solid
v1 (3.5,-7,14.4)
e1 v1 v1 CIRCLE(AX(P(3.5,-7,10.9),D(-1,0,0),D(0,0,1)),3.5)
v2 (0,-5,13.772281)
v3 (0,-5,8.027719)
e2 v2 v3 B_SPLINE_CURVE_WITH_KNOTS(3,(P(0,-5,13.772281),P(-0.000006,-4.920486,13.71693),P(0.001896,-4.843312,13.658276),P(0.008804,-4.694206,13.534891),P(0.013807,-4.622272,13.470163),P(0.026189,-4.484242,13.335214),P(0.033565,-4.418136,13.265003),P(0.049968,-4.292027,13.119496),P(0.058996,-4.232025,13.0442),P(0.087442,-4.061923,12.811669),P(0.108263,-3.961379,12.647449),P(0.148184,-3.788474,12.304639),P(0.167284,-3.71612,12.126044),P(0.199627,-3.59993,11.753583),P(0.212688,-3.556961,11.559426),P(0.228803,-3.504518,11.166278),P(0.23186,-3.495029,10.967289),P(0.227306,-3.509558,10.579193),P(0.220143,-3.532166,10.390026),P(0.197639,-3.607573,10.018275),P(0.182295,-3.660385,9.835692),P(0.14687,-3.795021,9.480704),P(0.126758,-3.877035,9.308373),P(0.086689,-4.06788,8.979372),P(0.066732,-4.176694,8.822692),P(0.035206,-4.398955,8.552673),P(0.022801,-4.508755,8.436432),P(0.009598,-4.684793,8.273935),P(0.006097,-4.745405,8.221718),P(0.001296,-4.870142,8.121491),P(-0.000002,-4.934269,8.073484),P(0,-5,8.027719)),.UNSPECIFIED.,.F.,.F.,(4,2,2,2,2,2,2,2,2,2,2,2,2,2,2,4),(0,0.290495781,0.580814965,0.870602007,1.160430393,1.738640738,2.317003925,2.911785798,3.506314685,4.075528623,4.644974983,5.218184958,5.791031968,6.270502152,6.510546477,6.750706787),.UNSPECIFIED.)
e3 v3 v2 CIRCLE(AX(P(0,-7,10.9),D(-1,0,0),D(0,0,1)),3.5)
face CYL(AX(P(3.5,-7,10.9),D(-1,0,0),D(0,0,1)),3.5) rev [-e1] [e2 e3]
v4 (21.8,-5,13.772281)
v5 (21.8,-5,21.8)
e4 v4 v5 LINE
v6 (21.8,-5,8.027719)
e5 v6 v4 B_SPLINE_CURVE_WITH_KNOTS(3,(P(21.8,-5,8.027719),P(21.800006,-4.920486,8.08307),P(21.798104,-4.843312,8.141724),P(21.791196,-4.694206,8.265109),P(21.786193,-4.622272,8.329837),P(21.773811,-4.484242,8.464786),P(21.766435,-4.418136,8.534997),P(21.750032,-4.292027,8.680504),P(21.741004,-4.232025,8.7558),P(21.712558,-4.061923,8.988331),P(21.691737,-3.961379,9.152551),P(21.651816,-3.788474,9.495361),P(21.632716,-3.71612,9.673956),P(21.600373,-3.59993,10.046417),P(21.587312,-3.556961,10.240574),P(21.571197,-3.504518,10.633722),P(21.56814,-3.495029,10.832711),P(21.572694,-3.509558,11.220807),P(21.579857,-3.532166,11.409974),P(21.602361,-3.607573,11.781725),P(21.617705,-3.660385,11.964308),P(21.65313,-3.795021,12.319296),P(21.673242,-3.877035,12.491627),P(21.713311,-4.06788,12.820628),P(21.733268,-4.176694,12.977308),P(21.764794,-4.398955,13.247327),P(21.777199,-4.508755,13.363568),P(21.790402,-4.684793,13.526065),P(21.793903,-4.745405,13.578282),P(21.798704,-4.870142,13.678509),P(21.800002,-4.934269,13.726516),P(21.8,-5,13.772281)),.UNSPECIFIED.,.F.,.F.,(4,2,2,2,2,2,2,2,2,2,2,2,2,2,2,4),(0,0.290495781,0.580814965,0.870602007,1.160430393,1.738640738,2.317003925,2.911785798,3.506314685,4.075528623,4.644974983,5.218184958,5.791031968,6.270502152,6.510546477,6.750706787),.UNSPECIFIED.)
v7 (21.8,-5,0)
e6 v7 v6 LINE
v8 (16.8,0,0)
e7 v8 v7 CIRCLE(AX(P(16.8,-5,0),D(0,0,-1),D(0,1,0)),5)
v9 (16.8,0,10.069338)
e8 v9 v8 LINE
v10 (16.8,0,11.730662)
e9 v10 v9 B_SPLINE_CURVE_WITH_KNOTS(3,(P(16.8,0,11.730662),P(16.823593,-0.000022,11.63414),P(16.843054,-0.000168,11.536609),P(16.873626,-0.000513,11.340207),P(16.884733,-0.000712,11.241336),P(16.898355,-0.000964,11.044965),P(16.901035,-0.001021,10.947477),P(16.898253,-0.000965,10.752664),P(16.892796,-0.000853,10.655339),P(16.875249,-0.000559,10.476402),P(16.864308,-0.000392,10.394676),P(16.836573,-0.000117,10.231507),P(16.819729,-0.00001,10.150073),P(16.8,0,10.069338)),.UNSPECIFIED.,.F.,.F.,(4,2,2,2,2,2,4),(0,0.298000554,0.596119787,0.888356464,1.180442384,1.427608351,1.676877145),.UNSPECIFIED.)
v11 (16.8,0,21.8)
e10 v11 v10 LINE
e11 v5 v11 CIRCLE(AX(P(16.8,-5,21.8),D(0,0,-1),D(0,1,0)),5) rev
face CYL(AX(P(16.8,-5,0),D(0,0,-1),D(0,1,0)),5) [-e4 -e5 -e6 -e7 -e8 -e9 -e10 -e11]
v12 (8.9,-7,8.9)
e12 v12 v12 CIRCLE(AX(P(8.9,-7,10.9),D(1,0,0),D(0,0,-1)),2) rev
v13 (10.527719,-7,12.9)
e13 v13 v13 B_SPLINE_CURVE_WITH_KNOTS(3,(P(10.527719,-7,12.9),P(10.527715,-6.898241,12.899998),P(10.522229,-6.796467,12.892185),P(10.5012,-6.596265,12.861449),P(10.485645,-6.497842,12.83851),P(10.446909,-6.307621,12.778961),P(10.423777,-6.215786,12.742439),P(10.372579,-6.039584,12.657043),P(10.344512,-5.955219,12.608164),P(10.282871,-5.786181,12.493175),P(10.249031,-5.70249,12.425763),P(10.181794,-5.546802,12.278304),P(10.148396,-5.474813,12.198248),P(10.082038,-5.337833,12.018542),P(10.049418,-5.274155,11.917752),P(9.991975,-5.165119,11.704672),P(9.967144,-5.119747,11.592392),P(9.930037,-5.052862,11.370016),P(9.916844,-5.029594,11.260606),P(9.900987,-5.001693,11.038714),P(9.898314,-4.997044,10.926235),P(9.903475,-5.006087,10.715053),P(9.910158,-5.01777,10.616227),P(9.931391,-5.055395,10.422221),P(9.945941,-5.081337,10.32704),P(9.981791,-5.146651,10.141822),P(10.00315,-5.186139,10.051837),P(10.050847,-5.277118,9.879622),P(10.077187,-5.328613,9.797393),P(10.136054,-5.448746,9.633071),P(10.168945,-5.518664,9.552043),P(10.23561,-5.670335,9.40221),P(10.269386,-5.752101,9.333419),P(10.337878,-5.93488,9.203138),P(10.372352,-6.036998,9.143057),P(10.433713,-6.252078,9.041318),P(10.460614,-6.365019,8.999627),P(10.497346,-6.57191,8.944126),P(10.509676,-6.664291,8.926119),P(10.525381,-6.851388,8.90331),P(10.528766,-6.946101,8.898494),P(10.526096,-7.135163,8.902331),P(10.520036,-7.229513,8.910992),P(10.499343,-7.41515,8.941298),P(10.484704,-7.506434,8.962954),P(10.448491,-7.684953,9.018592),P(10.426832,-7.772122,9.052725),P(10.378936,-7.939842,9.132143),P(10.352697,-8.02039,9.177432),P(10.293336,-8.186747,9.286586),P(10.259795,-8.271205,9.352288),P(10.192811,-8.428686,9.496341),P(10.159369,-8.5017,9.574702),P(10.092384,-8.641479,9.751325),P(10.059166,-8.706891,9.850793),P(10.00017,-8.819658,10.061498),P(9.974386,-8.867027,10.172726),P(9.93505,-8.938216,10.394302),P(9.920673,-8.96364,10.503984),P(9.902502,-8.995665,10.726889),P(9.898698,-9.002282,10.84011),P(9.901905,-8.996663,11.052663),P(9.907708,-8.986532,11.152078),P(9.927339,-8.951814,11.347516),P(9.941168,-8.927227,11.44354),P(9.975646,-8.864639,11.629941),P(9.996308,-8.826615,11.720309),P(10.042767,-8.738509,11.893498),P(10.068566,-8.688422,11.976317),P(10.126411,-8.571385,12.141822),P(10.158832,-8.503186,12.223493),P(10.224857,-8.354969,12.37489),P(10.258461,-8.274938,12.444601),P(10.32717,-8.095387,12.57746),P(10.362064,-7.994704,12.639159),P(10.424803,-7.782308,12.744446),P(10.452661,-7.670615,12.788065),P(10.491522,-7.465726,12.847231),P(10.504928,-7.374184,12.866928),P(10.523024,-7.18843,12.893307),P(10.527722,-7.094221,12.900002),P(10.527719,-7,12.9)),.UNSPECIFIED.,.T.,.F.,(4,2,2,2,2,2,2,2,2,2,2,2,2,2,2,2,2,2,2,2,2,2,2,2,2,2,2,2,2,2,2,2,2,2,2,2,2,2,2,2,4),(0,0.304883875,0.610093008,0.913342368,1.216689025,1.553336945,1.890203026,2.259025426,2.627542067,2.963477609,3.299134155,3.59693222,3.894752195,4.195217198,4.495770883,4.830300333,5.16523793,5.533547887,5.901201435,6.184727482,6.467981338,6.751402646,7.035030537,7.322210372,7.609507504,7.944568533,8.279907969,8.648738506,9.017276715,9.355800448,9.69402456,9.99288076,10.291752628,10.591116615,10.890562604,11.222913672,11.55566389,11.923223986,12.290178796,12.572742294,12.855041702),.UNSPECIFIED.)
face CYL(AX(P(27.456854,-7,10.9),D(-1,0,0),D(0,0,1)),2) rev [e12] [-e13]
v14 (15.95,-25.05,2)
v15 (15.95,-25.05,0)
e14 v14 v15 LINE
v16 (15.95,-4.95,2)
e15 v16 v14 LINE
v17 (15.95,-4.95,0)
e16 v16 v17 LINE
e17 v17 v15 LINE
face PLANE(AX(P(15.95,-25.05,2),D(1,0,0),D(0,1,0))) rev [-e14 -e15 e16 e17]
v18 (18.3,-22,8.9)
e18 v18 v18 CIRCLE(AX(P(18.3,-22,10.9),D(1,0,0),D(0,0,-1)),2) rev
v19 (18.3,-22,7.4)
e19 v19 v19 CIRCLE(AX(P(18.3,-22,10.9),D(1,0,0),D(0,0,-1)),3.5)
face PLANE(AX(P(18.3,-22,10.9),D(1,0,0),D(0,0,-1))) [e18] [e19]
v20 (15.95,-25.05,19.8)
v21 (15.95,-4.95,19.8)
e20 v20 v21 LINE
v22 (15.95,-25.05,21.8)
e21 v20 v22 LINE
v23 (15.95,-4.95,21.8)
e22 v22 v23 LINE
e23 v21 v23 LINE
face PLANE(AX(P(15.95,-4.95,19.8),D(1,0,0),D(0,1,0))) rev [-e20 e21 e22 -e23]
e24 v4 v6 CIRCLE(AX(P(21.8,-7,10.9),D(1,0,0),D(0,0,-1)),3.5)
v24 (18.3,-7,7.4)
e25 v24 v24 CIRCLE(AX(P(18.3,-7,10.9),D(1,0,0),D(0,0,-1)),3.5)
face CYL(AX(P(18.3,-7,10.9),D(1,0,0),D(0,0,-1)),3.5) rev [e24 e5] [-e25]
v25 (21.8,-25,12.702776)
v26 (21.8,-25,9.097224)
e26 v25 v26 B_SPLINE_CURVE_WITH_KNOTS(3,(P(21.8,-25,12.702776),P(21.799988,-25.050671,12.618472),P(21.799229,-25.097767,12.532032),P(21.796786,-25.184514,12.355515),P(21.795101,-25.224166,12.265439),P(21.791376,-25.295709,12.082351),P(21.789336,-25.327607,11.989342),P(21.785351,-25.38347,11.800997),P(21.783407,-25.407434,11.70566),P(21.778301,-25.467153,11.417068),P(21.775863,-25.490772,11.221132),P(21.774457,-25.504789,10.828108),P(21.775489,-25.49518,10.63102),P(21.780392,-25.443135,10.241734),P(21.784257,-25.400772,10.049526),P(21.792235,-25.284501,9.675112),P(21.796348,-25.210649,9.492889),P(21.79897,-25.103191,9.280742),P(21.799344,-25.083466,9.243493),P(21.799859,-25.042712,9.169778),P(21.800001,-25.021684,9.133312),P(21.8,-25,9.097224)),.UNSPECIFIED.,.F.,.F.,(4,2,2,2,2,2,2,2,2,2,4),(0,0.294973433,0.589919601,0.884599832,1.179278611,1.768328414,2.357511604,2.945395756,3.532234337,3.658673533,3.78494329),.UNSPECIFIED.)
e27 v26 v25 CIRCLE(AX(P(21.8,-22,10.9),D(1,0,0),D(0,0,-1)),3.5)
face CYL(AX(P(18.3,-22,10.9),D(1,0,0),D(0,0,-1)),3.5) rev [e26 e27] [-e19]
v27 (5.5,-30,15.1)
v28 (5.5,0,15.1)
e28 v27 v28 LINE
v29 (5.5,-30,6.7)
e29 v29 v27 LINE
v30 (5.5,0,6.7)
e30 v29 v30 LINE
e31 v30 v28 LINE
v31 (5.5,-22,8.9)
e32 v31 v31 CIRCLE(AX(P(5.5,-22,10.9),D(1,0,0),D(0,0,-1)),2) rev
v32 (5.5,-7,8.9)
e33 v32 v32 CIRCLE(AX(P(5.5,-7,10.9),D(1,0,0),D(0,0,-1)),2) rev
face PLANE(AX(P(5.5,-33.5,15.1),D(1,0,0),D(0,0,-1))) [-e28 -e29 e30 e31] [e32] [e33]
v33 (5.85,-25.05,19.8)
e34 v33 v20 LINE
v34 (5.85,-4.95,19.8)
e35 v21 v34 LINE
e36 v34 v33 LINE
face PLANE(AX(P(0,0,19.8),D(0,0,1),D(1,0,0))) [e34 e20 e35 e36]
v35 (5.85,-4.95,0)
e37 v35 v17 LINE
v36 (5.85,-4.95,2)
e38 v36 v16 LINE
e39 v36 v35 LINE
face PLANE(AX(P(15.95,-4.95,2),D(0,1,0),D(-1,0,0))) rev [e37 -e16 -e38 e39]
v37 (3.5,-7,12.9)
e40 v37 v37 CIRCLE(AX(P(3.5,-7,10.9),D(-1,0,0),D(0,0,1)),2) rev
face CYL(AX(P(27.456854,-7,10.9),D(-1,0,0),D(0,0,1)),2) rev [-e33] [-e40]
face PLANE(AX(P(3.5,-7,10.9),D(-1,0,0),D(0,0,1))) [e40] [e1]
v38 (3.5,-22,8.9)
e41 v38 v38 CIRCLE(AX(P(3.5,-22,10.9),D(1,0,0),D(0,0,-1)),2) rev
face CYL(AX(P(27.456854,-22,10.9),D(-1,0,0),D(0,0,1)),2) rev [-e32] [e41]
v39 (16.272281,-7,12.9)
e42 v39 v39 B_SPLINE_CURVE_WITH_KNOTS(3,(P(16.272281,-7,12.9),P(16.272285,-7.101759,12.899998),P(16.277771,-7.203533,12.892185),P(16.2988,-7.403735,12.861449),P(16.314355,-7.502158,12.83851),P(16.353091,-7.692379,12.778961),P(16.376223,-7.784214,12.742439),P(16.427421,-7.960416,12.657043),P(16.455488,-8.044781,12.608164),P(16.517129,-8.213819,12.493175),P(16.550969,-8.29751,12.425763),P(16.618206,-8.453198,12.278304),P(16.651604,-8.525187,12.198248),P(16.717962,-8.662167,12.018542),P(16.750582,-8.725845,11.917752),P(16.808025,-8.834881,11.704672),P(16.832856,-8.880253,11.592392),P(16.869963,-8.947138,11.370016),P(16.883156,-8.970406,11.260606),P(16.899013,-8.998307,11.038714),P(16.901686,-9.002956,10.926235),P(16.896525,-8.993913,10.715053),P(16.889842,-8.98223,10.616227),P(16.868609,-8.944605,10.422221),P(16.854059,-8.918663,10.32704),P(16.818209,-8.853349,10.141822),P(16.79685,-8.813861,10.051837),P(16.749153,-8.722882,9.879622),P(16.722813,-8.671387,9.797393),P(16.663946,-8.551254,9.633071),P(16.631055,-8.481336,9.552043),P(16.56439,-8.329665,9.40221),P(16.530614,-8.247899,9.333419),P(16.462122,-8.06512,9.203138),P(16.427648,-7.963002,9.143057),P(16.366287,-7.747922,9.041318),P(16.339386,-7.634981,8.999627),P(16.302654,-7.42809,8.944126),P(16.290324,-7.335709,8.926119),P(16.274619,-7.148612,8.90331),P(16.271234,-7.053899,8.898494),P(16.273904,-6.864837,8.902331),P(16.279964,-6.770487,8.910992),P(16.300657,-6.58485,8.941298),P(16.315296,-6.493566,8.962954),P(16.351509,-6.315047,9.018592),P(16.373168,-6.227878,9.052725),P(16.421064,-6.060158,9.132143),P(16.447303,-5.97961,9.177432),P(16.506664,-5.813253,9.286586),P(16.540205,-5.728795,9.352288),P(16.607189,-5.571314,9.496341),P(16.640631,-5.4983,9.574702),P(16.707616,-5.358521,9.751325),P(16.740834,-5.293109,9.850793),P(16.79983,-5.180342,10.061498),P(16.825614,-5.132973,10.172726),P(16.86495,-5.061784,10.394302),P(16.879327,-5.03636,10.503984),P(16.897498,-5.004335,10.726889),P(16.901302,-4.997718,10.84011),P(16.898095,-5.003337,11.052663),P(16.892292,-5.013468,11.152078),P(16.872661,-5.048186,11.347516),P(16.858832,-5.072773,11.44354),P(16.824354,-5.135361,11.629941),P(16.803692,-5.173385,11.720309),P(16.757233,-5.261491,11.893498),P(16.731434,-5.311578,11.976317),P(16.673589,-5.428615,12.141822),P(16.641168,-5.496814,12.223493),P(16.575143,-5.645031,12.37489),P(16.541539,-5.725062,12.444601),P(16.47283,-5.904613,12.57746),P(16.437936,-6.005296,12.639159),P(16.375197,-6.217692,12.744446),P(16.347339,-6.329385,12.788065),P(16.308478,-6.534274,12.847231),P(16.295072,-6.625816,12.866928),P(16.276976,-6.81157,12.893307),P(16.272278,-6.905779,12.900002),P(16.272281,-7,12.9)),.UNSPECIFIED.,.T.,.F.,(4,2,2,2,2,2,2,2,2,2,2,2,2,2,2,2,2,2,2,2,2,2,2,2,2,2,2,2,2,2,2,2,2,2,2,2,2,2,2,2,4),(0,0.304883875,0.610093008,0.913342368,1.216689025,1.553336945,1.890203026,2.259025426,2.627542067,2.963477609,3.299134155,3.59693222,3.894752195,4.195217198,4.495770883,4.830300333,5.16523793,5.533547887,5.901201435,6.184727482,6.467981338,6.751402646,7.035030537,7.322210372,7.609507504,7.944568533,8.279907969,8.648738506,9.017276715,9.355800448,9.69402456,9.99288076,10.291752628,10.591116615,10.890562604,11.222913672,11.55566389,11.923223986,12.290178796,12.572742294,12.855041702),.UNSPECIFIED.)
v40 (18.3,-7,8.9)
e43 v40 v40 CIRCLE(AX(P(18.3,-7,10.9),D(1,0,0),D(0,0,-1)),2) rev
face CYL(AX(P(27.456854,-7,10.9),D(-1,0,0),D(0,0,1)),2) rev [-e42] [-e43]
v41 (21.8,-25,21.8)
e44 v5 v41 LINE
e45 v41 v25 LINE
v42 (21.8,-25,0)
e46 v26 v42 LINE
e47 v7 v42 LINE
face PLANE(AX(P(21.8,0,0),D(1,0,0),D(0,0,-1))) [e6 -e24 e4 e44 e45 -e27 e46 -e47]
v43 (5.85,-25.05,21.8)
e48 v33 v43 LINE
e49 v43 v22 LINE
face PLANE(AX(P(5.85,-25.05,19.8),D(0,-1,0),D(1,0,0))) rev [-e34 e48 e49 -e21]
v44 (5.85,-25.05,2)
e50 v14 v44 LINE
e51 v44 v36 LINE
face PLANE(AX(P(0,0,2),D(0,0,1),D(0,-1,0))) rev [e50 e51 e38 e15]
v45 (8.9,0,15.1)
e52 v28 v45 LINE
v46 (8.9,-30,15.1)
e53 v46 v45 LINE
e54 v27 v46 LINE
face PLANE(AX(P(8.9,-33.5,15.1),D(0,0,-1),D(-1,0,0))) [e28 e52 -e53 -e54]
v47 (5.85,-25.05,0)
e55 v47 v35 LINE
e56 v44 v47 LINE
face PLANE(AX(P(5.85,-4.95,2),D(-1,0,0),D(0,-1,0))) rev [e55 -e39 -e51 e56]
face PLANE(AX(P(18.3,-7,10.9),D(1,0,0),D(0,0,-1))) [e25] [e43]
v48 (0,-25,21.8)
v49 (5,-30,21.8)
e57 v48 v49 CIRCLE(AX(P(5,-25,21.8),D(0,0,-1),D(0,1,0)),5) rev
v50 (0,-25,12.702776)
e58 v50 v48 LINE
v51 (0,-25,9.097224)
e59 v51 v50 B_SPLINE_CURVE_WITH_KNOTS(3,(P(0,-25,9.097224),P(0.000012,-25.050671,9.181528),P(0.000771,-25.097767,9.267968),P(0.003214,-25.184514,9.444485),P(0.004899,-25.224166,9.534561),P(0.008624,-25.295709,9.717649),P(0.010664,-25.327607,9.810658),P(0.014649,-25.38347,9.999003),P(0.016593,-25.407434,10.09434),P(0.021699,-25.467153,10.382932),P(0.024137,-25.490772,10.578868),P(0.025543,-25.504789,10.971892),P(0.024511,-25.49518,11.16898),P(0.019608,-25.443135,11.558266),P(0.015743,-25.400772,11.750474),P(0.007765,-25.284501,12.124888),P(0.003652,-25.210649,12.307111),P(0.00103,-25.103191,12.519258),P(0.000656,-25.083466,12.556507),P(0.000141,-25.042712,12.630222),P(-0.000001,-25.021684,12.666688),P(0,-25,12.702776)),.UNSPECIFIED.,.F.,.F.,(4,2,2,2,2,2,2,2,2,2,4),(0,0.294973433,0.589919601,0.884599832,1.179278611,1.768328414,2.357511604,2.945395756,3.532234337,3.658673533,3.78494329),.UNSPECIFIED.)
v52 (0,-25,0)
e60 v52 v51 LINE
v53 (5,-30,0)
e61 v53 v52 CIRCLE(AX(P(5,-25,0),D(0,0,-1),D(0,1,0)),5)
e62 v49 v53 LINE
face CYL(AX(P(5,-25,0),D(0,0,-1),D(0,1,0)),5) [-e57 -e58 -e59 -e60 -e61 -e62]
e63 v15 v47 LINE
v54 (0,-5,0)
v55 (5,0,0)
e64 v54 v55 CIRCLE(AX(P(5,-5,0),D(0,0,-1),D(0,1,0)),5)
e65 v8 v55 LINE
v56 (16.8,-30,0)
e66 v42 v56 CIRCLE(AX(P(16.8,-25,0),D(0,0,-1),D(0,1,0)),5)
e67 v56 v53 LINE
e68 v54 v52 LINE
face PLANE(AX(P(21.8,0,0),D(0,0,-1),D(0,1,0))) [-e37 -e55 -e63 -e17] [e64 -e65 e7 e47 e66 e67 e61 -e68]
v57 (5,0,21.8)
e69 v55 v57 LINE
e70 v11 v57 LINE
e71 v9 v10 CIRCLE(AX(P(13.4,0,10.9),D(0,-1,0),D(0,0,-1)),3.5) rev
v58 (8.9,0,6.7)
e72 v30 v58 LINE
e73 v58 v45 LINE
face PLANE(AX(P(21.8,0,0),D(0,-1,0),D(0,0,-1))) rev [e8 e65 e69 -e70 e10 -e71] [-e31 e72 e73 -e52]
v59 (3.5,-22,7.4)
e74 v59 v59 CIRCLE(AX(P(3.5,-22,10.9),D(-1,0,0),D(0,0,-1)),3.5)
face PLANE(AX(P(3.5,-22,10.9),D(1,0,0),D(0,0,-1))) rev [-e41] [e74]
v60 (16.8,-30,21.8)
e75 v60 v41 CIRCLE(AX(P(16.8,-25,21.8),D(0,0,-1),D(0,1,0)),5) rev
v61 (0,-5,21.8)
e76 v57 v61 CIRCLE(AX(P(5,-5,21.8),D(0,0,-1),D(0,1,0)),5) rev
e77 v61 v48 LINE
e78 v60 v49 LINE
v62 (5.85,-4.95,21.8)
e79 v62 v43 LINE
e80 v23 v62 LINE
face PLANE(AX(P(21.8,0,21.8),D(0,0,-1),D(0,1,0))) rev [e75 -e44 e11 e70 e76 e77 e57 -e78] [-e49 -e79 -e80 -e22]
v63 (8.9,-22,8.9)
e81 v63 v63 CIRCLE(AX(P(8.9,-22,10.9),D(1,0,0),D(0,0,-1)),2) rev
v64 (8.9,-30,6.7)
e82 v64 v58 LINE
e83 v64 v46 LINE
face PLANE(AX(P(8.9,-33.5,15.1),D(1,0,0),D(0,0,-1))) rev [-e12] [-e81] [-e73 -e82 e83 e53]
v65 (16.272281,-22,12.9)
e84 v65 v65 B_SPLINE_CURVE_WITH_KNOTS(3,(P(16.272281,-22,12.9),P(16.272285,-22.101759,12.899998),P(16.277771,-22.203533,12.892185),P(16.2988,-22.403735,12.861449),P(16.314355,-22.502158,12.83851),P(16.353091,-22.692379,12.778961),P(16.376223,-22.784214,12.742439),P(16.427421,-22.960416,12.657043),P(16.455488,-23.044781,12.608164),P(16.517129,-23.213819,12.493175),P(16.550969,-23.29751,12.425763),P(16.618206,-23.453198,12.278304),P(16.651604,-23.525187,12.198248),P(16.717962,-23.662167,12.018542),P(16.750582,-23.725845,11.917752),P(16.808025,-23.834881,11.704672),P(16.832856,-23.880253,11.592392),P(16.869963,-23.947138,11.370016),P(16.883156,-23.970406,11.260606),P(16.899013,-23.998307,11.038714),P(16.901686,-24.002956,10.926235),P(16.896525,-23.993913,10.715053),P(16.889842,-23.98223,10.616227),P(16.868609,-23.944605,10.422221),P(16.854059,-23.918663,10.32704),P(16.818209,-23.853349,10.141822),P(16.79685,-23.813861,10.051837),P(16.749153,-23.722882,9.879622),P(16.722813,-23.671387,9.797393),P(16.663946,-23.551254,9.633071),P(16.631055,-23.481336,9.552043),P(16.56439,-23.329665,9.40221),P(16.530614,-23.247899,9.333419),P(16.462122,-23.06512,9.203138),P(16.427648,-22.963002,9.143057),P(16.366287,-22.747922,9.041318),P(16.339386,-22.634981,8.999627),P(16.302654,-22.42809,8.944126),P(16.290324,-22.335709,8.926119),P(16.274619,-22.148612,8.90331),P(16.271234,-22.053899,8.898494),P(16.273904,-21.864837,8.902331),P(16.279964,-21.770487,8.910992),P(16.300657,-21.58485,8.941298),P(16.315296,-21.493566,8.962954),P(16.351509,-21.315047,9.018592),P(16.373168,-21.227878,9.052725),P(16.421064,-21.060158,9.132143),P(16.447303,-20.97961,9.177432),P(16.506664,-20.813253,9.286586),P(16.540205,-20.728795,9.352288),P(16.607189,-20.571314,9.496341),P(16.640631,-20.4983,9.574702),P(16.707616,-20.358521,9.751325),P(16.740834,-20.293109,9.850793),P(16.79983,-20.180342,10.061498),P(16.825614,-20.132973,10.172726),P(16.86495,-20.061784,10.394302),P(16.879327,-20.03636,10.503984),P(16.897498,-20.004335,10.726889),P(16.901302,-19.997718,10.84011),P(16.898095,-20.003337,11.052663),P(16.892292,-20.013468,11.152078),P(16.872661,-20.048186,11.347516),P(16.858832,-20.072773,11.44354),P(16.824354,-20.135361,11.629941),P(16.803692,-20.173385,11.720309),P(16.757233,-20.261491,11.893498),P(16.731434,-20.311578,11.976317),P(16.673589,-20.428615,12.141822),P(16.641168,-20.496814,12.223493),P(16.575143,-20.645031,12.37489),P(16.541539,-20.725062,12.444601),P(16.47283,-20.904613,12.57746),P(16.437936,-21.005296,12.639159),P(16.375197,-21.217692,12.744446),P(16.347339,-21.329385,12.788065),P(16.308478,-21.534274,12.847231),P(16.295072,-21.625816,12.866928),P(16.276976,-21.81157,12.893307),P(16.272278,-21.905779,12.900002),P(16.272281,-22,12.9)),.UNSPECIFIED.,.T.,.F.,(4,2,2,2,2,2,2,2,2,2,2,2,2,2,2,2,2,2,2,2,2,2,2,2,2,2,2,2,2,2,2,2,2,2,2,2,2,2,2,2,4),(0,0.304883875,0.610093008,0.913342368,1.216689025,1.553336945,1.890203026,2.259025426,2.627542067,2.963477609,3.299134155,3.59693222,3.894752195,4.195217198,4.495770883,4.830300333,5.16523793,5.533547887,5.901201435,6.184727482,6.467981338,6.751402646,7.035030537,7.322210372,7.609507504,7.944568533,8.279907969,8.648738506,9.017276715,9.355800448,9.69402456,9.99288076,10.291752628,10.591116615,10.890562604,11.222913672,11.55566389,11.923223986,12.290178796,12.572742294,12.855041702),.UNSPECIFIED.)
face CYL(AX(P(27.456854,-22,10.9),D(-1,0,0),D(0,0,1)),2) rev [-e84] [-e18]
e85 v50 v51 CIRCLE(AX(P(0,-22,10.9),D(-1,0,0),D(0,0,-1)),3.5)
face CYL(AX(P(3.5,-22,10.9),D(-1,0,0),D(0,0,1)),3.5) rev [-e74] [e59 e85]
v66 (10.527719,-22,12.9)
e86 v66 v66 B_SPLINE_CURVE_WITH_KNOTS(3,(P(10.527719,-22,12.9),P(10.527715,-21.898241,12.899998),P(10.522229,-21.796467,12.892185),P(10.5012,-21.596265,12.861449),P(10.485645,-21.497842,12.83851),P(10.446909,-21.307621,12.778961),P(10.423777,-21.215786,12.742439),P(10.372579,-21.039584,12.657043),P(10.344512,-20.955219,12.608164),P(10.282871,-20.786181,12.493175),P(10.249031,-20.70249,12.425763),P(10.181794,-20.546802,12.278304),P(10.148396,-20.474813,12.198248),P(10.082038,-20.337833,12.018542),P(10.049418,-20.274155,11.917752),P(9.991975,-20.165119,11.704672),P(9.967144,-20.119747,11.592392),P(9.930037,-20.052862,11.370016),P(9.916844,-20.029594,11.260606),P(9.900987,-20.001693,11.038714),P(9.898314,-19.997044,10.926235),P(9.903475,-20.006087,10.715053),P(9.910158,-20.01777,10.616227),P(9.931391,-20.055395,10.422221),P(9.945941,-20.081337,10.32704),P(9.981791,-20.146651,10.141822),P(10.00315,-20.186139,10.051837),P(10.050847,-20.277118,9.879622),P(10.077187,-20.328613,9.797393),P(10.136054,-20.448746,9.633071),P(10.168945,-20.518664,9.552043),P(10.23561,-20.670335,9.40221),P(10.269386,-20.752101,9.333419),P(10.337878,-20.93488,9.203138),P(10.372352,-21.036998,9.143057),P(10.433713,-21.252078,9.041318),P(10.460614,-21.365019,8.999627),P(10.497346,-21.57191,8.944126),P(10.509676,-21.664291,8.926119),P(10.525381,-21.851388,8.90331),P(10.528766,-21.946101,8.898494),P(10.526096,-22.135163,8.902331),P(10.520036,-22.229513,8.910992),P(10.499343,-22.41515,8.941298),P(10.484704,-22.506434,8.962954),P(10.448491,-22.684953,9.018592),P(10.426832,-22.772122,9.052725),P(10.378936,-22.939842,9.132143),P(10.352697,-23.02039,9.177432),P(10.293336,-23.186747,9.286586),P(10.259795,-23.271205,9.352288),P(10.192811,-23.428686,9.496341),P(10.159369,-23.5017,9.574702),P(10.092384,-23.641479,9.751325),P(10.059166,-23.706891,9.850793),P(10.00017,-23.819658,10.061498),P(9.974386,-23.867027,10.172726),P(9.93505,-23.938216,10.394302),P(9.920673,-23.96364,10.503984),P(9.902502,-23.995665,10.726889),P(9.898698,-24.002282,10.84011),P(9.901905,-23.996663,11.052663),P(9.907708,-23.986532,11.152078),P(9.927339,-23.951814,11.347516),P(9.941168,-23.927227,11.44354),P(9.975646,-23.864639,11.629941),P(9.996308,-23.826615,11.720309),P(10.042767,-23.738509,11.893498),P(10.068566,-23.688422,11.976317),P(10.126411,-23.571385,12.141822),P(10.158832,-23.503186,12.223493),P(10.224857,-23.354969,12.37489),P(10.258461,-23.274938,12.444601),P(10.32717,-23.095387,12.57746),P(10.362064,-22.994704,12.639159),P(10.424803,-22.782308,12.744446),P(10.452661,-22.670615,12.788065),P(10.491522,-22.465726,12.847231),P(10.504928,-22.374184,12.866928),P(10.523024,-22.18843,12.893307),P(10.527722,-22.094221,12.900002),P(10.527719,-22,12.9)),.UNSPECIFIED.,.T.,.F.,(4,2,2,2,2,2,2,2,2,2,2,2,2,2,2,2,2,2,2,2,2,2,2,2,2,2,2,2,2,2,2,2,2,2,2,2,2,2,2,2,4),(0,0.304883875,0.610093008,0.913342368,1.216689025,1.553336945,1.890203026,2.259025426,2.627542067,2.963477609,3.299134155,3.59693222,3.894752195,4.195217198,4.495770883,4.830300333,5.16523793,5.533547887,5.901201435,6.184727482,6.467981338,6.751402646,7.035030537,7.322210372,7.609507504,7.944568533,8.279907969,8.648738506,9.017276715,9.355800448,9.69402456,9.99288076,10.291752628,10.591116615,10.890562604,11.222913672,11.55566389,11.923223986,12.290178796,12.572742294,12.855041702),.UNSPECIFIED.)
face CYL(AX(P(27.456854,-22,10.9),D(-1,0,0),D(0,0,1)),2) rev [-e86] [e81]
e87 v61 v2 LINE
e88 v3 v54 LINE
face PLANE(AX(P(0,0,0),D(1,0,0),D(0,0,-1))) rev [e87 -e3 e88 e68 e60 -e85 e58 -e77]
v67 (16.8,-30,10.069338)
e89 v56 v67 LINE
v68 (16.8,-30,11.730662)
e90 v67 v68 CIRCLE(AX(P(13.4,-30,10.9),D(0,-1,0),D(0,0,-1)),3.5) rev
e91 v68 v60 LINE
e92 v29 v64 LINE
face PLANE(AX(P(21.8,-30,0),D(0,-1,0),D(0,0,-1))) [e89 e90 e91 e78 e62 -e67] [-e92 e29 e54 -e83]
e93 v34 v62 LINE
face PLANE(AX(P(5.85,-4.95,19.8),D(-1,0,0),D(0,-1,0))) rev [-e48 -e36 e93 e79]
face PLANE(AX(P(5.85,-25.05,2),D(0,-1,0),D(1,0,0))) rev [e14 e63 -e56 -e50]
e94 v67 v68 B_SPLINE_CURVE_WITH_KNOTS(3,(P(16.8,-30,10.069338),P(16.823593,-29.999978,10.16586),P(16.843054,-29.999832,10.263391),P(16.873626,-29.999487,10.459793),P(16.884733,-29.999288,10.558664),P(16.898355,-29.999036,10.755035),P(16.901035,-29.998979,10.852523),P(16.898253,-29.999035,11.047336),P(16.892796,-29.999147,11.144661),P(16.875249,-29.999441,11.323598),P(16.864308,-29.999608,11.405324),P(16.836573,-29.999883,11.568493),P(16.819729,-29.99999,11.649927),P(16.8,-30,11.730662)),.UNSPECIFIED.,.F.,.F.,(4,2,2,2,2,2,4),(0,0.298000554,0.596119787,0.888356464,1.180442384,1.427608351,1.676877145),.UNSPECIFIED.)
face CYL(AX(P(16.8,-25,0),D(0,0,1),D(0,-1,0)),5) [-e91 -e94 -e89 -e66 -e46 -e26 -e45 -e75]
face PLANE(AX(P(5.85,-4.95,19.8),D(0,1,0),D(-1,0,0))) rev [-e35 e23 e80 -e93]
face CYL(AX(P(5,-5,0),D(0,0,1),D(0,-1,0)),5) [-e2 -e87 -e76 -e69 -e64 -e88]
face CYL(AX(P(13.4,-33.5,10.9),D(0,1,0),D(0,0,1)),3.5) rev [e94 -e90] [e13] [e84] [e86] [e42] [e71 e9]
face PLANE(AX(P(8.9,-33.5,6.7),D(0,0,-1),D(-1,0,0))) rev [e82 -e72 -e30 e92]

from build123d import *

# Parameters (mm, degrees)
CROQUIS1_W                        = 21.8
CROQUIS1_H                        = 30
SALIENTE_EXTRUIR1_DEPTH           = 21.8
CROQUIS6_R                        = 2
CORTAR_EXTRUIR2_DEPTH             = 21.8
CORTAR_EXTRUIR4_REACH             = 45.017
CROQUIS11_R                       = 3.5
CROQUIS11_W                       = 3.4
CROQUIS11_H                       = 8.4
CORTAR_EXTRUIR4_DIRECTION_2_DEPTH = 3.5
REDONDEO1_R                       = 5
CROQUIS13_R                       = 3.5
CORTAR_EXTRUIR6_DEPTH             = 3.5
CROQUIS16_W                       = 10.1
CROQUIS16_H                       = 20.1
CORTAR_EXTRUIR7_DEPTH             = 2
CROQUIS17_W                       = 10.1
CROQUIS17_H                       = 20.1
CORTAR_EXTRUIR8_DEPTH             = 2
CORTAR_EXTRUIR9_START             = -3.5
CROQUIS7_R                        = 3.5
CORTAR_EXTRUIR9_DEPTH             = 3.5


with BuildPart() as part:
    # Croquis1 → Saliente-Extruir1 (new body)
    with BuildSketch(Plane(origin=(0, 0, 0), x_dir=(0, 0, -1), z_dir=(1, 0, 0))):
        with Locations((-10.9, -15)):
            Rectangle(CROQUIS1_W, CROQUIS1_H)
    extrude(amount=SALIENTE_EXTRUIR1_DEPTH)

    # Croquis6 → Cortar-Extruir2 (cut)
    with BuildSketch(Plane.ZY):
        with Locations((10.9, -22)):
            Circle(CROQUIS6_R)
        with Locations((10.9, -7)):
            Circle(CROQUIS6_R)
    extrude(amount=-CORTAR_EXTRUIR2_DEPTH, mode=Mode.SUBTRACT)

    # Cortar-Extruir4: up to this face of the body (flat: up to its plane)
    cortar_extruir4_end = Plane(part.part.faces().sort_by_distance((10.9, 0, 10.9))[0])
    # Croquis11 → Cortar-Extruir4 (cut, up to the picked face)
    with BuildSketch(Plane.XZ.offset(30), mode=Mode.PRIVATE) as cortar_extruir4_sk1:
        with Locations(Location((13.4, 10.9, 0), (0, 0, 270))):
            Circle(CROQUIS11_R)
    cortar_extruir4_tool1 = split(extrude(cortar_extruir4_sk1.sketch, amount=-CORTAR_EXTRUIR4_REACH, mode=Mode.PRIVATE), bisect_by=cortar_extruir4_end, keep=Keep.BOTH, mode=Mode.PRIVATE)
    # Croquis11 → Cortar-Extruir4 (cut, up to the picked face)
    with BuildSketch(Plane.XZ.offset(30), mode=Mode.PRIVATE) as cortar_extruir4_sk2:
        with Locations((7.2, 10.9)):
            Rectangle(CROQUIS11_W, CROQUIS11_H)
    cortar_extruir4_tool2 = split(extrude(cortar_extruir4_sk2.sketch, amount=-CORTAR_EXTRUIR4_REACH, mode=Mode.PRIVATE), bisect_by=cortar_extruir4_end, keep=Keep.BOTH, mode=Mode.PRIVATE)
    add(cortar_extruir4_tool1.solids().sort_by(Axis((13.4, -30, 10.9), (0, 1, 0)))[0], mode=Mode.SUBTRACT)
    add(cortar_extruir4_tool2.solids().sort_by(Axis((7.2, -30, 10.9), (0, 1, 0)))[0], mode=Mode.SUBTRACT)

    # Croquis11 → Cortar-Extruir4 direction 2 (cut)
    with BuildSketch(Plane.XZ.offset(30)):
        with Locations(Location((13.4, 10.9, 0), (0, 0, 270))):
            Circle(CROQUIS11_R)
        with Locations((7.2, 10.9)):
            Rectangle(CROQUIS11_W, CROQUIS11_H)
    extrude(amount=CORTAR_EXTRUIR4_DIRECTION_2_DEPTH, mode=Mode.SUBTRACT)

    # Redondeo1
    # the kernel refuses this fillet: 5 mm, written as the material it takes off along each edge
    with BuildSketch(Plane(origin=(21.8, -30, 34.3), x_dir=(0, 1, 0), z_dir=(0, 0, -1)), Plane(origin=(0, 0, -12.5), x_dir=(1, 0, 0), z_dir=(0, 0, 1))) as redondeo1_piece_1:
        with BuildLine():
            CenterArc((REDONDEO1_R, -REDONDEO1_R), REDONDEO1_R, 90, 90)
            Line((0, -REDONDEO1_R), (0, 0))
            Line((0, 0), (REDONDEO1_R, 0))
        make_face()
    extrude(amount=46.8, mode=Mode.SUBTRACT)
    with BuildSketch(Plane(origin=(21.8, 0, -12.5), x_dir=(-1, 0, 0), z_dir=(0, 0, 1)), Plane(origin=(0, -30, 34.3), x_dir=(0, 1, 0), z_dir=(0, 0, -1))) as redondeo1_piece_2:
        with BuildLine():
            CenterArc((REDONDEO1_R, REDONDEO1_R), REDONDEO1_R, 180, 90)
            Line((0, REDONDEO1_R), (0, 0))
            Line((0, 0), (REDONDEO1_R, 0))
        make_face()
    extrude(amount=46.8, mode=Mode.SUBTRACT)

    # Croquis13 → Cortar-Extruir6 (cut)
    with BuildSketch(Plane.ZY):
        with Locations((10.9, -7)):
            Circle(CROQUIS13_R)
        with Locations(Location((10.9, -22, 0), (0, 0, 301.002719134))):
            Circle(CROQUIS13_R)
    extrude(amount=-CORTAR_EXTRUIR6_DEPTH, mode=Mode.SUBTRACT)

    # Croquis16 → Cortar-Extruir7 (cut)
    with BuildSketch(Plane.XY.offset(21.8)):
        with Locations((10.9, -15)):
            Rectangle(CROQUIS16_W, CROQUIS16_H)
    extrude(amount=-CORTAR_EXTRUIR7_DEPTH, mode=Mode.SUBTRACT)

    # Croquis17 → Cortar-Extruir8 (cut)
    with BuildSketch(Plane(origin=(0, 0, 0), x_dir=(-1, 0, 0), z_dir=(0, 0, -1))):
        with Locations((-10.9, -15)):
            Rectangle(CROQUIS17_W, CROQUIS17_H)
    extrude(amount=-CORTAR_EXTRUIR8_DEPTH, mode=Mode.SUBTRACT)

    # Croquis7 → Cortar-Extruir9 (cut)
    with BuildSketch(Plane(origin=(21.8, 0, 0), x_dir=(0, 0, -1), z_dir=(1, 0, 0)).offset(CORTAR_EXTRUIR9_START)):
        with Locations(Location((-10.9, -22, 0), (0, 0, 238.997280866))):
            Circle(CROQUIS7_R)
        with Locations(Location((-10.9, -7, 0), (0, 0, 180))):
            Circle(CROQUIS7_R)
    extrude(amount=CORTAR_EXTRUIR9_DEPTH, mode=Mode.SUBTRACT)


solid = part.part
